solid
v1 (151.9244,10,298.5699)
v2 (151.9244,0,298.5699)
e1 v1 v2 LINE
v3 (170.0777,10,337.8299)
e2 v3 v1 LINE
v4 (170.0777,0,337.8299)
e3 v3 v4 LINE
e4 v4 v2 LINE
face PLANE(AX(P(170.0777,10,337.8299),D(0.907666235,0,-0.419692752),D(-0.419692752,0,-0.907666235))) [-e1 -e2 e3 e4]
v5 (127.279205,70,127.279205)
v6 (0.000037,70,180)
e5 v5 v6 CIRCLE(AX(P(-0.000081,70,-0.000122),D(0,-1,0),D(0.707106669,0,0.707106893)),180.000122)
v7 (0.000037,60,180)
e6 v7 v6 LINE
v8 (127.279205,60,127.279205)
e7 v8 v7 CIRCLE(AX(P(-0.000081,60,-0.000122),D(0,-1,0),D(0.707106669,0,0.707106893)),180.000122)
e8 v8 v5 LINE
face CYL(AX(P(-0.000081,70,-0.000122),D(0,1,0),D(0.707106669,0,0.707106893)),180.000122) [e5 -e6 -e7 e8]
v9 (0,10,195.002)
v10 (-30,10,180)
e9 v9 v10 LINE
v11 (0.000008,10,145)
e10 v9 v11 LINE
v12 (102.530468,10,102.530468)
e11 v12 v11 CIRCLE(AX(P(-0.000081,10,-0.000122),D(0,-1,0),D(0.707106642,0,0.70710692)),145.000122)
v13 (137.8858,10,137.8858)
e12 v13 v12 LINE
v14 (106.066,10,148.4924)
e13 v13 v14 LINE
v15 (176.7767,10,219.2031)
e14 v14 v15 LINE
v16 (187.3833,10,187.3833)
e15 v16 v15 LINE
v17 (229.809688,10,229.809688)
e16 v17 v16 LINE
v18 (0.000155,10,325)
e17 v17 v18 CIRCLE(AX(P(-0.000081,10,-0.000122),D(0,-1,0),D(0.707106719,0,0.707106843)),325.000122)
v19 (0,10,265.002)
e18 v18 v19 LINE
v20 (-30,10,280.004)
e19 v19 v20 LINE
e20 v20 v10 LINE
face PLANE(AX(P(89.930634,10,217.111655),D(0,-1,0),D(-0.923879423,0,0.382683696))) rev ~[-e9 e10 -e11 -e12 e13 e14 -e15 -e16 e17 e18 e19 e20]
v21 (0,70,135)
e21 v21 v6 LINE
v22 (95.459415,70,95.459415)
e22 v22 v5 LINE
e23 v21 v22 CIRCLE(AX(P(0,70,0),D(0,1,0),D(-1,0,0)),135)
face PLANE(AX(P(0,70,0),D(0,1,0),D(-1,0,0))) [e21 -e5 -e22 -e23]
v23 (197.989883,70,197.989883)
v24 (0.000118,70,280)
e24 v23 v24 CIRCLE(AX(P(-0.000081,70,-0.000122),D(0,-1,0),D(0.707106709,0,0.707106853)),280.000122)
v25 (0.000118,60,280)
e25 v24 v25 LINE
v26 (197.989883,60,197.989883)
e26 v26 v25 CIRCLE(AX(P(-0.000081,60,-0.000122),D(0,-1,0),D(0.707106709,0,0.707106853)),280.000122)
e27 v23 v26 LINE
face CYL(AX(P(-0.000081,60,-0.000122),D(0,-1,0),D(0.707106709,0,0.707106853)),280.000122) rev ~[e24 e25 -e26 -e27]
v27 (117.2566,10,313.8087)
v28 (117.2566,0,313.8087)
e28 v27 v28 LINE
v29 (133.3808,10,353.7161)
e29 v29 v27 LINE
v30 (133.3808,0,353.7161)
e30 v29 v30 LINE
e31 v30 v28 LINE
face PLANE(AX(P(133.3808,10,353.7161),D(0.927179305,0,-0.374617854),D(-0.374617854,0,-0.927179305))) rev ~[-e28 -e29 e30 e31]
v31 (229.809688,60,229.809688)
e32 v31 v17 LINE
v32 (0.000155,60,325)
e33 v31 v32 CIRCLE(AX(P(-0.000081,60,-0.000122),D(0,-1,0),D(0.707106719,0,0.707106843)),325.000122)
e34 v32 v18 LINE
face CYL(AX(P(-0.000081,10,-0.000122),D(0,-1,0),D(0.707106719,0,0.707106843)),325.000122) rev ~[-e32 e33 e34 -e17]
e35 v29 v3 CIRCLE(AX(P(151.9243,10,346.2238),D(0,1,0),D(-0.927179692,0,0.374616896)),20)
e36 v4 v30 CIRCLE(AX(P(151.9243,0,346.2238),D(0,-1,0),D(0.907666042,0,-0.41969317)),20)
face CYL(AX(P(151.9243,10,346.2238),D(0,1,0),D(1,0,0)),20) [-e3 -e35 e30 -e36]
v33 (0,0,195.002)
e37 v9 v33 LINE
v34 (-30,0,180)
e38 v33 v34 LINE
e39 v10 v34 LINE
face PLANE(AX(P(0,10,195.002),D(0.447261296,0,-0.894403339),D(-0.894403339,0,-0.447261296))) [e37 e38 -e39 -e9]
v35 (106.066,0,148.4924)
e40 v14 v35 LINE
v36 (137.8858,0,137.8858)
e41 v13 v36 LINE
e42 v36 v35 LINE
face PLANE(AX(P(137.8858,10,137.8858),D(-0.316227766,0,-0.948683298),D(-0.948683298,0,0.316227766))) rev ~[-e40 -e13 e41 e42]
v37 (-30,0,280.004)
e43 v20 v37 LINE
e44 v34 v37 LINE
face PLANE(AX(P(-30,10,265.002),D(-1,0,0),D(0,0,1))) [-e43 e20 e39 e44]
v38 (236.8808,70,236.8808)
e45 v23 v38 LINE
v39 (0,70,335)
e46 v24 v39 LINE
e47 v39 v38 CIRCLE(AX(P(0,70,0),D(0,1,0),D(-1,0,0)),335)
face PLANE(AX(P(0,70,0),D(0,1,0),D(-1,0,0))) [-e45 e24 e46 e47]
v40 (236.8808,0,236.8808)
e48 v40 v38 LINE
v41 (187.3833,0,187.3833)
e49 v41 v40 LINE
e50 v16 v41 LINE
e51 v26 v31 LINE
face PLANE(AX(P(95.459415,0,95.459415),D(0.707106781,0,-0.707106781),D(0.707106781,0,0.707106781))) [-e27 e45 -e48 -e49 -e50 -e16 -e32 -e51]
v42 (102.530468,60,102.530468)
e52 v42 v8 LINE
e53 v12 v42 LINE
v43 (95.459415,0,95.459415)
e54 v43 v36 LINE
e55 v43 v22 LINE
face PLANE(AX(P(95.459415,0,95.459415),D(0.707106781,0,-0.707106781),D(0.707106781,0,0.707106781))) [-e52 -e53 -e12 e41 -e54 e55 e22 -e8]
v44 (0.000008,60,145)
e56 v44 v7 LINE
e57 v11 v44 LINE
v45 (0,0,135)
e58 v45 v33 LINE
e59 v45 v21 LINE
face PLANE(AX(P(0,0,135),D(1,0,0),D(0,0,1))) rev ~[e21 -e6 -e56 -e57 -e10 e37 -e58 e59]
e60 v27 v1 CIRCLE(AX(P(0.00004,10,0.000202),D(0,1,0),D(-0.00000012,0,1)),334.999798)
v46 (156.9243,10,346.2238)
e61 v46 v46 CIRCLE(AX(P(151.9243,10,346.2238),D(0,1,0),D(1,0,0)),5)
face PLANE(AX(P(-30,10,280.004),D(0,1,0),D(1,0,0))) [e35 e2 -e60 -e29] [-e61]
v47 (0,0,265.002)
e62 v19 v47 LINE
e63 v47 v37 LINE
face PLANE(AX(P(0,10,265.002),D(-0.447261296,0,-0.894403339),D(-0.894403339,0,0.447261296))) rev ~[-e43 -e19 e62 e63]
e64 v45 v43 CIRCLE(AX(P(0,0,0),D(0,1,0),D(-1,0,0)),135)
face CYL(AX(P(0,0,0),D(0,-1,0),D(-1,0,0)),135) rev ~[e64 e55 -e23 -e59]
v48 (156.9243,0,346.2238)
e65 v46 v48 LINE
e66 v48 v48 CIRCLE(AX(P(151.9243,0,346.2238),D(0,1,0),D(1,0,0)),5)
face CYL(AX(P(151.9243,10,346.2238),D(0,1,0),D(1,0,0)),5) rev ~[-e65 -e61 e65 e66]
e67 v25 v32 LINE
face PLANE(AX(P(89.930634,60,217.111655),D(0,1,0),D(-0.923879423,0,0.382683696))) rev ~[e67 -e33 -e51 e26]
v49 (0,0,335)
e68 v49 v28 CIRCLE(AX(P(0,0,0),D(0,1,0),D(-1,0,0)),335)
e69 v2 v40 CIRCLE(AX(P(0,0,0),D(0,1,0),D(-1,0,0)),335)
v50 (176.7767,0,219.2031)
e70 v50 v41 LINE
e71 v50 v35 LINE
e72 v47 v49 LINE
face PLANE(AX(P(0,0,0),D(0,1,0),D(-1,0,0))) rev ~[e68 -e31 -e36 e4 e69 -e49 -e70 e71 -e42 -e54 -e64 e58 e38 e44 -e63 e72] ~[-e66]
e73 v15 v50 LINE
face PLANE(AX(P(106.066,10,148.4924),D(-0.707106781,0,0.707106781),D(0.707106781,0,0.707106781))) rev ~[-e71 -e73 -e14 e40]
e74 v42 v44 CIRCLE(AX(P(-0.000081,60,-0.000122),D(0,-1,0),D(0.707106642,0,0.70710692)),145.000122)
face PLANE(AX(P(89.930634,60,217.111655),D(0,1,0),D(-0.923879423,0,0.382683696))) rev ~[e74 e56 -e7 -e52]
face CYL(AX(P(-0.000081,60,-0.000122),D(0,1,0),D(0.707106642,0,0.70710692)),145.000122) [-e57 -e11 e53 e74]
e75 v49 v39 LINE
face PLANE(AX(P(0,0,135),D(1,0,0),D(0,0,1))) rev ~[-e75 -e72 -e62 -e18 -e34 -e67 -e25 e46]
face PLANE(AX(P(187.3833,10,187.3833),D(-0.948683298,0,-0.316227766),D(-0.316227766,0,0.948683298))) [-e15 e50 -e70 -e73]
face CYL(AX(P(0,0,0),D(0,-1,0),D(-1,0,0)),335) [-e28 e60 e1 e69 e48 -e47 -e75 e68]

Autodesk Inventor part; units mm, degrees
ref_plane "YZ Plane" through (0, 0, 0) normal (1, 0, 0) x (0, 1, 0)
ref_plane "XZ Plane" through (0, 0, 0) normal (0, 1, 0) x (-1, 0, 0)
ref_plane "XY Plane" through (0, 0, 0) normal (0, 0, 1) x (1, 0, 0)
sketch "Sketch1" plane through (0, 0, 0) normal (0, 1, 0) x (-1, 0, 0)
  circle A0 centre (0, 0) radius 335
  line L0 (335, 0) -> (-335, 0)
  line L1 (0, -335) -> (0, 335)
  line L2 (0, 0) -> (-236.8808, 236.8808)
  line L3 (0, 0) -> (236.8808, -236.8808)
  line L4 (0, 0) -> (236.8808, 236.8808)
  line L5 (0, 0) -> (-236.8808, -236.8808)
  circle A1 centre (0, 0) radius 135
  point P0 (-95.4594, 95.4594)
  point P1 (0, 135)
  dimension "d0" = 670
  dimension "d1" = 45
  dimension "d2" = 45
  dimension "d17" = 200
extrude "Extrusion1" add sketch "Sketch1" along normal blind 70 contours L1 A1 L2 A0
sketch "Sketch2" plane through (95.4594, 0, 95.4594) normal (0.7071068, 0, -0.7071068) x (-0.7071068, 0, -0.7071068)
  line L0 (-190, 60) -> (-10, 60)
  line L1 (-10, 60) -> (-10, 10)
  line L2 (-10, 10) -> (-190, 10)
  line L3 (-190, 10) -> (-190, 60)
  line L4 (-200, 0) -> (0, 0) projected
  line L5 (-200, 70) -> (0, 70) projected
  line L6 (-200, 0) -> (-200, 70) projected
  line L7 (0, 0) -> (0, 70) projected
  point P0 (135, 0)
  point P1 (0, 35)
  dimension "d6" = 10
  dimension "d7" = 10
  dimension "d8" = 10
  dimension "d9" = 10
sketch3d "3D Sketch1"
  arc A0 (95.4594, 70, 95.4594) -> (0, 70, 135) centre (0, 70, 0) ccw
sweep "Sweep1" cut profiles "Sketch2" path "3D Sketch1" contours L0 L1 L2 L3
sketch "Sketch3" plane through (95.4594, 0, 95.4594) normal (0.7071068, 0, -0.7071068) x (-0.7071068, 0, -0.7071068)
  line L0 (-101.8808, 70) -> (-200, 70) projected
  line L1 (32.4695, 60) -> (-94.8097, 60) projected
  line L2 (-145, 70) -> (-45, 70)
  line L3 (-45, 70) -> (-45, 60)
  line L4 (-45, 60) -> (-145, 60)
  line L5 (-145, 60) -> (-145, 70)
  line L6 (-200, 0) -> (-200, 70) projected
  line L7 (0, 0) -> (0, 70) projected
  point P0 (135, 0)
  dimension "d16" = 100
  dimension "d18" = 45
sketch3d "3D Sketch2"
  arc A0 (95.4594, 70, 95.4594) -> (0, 70, 135) centre (0, 70, 0) ccw
sweep "Sweep2" cut profiles "Sketch3" path "3D Sketch2"
sketch "Sketch5" plane through (0, 10, 325) normal (0, 1, 0) x (1, 0, 0)
  line L0 (0, 0) -> (0, 180) projected
  arc A0 (0, 145) -> (127.2792, 197.7208) centre (0, 325) ccw projected
  line L1 (127.2792, 197.7208) -> (95.4594, 229.5406) projected
  arc A1 (0, 190) -> (95.4594, 229.5406) centre (0, 325) ccw projected
  line L2 (0, 190) -> (0, 145) projected
  arc A2 (0, 45) -> (197.9899, 127.0101) centre (0, 325) ccw projected
  line L3 (0, 45) -> (0, -10) projected
  arc A3 (0, -10) -> (236.8808, 88.1192) centre (0, 325) ccw projected
  line L4 (236.8808, 88.1192) -> (197.9899, 127.0101) projected
  line L5 (0, 145) -> (-30, 145)
  line L6 (-30, 145) -> (-30, 44.996)
  line L7 (-30, 44.996) -> (0, 44.996)
  line L8 (0, 44.996) -> (0, 145)
  line L9 (0, 190) -> (0, -10) projected
  line L10 (0, 129.998) -> (-30, 129.998)
  line L11 (-30, 129.998) -> (-30, 59.998)
  line L12 (-30, 59.998) -> (0, 59.998)
  line L13 (0, 59.998) -> (0, 129.998)
  line L14 (0, 44.996) -> (-30, 145) construction
  line L15 (0, 145) -> (-30, 44.996) construction
  line L16 (0, 59.998) -> (-30, 129.998) construction
  line L17 (-30, 59.998) -> (0, 129.998) construction
  line L18 (-15, 94.998) -> (-30, 94.998) construction
  line L19 (-15, 94.998) -> (-30, 94.998) construction
  line L20 (0, 59.998) -> (-30, 44.996)
  line L21 (0, 129.998) -> (-30, 145)
  point P0 (0, 44.996)
  point P1 (0, 59.998)
  dimension "d21" = 30
  dimension "d27" = 70
extrude "Extrusion2" add sketch "Sketch5" against normal blind 10 contours L6 L12 L20 | L12 L6 L10 L0 | L10 L6 L21
sketch "Sketch6" plane through (-30, 10, 280.004) normal (0, 1, 0) x (1, 0, 0)
  line L0 (132.5305, 177.4736) -> (259.8097, 50.1943) projected
  arc A0 (30, 135.004) -> (132.5305, 177.4736) centre (30, 280.004) ccw projected
  line L1 (30, 85.002) -> (30, 135.004) projected
  line L2 (0, 100.004) -> (0, 0) projected
  line L3 (30, -44.996) -> (30, 15.002) projected
  arc A1 (30, -44.996) -> (259.8097, 50.1943) centre (30, 280.004) ccw projected
  arc A2 (30, 100.004) -> (157.2792, 152.7248) centre (30, 280.004) ccw projected
  line L4 (157.2792, 152.7248) -> (136.066, 131.5116)
  line L5 (136.066, 131.5116) -> (206.7767, 60.8009)
  line L6 (206.7767, 60.8009) -> (227.9899, 82.0141)
  line L7 (227.9899, 82.0141) -> (157.2792, 152.7248)
  arc A3 (30, 100.004) -> (157.2792, 152.7248) centre (30, 280.004) ccw projected
  arc A4 (30, 0.004) -> (227.9899, 82.0141) centre (30, 280.004) ccw projected
  line L8 (30, 0.004) -> (30, -54.996) projected
  arc A5 (30, -54.996) -> (266.8808, 43.1233) centre (30, 280.004) ccw projected
  line L9 (266.8808, 43.1233) -> (227.9899, 82.0141) projected
  arc A6 (30, 100.004) -> (157.2792, 152.7248) centre (30, 280.004) ccw projected
  line L10 (157.2792, 152.7248) -> (125.4594, 184.5446) projected
  arc A7 (30, 145.004) -> (125.4594, 184.5446) centre (30, 280.004) ccw projected
  line L11 (30, 145.004) -> (30, 100.004) projected
  line L12 (167.8858, 142.1182) -> (146.6726, 120.905)
  line L13 (146.6726, 120.905) -> (196.1701, 71.4075)
  line L14 (196.1701, 71.4075) -> (217.3833, 92.6207)
  line L15 (217.3833, 92.6207) -> (167.8858, 142.1182)
  line L16 (167.8858, 142.1182) -> (196.1701, 71.4075) construction
  line L17 (217.3833, 92.6207) -> (146.6726, 120.905) construction
  line L18 (157.2792, 152.7248) -> (206.7767, 60.8009) construction
  line L19 (227.9899, 82.0141) -> (136.066, 131.5116) construction
  line L20 (182.028, 106.7629) -> (171.4214, 96.1563) construction
  line L21 (182.028, 106.7629) -> (171.4214, 96.1563) construction
  line L22 (217.3833, 92.6207) -> (206.7767, 60.8009)
  line L23 (167.8858, 142.1182) -> (136.066, 131.5116)
  line L24 (30, 85.002) -> (0, 100.004) projected
  line L25 (0, 0) -> (30, 15.002) projected
  point P0 (207.7219, 63.6364)
  point P1 (217.3833, 92.6207)
  point P2 (167.8858, 142.1182)
  point P3 (205.637, 61.9406)
  dimension "d23" = 30
  dimension "d24" = 70
extrude "Extrusion3" cut sketch "Sketch6" against normal blind 10 contours L0 L14 L5 L12 | L12 L5 L23 | L22 A4 L5 L14 | L22 L5 A4
sketch "Sketch7" plane through (-30, 10, 280.004) normal (0, 1, 0) x (1, 0, 0)
  arc A0 (30, -44.996) -> (259.8097, 50.1943) centre (30, 280.004) ccw projected
  arc A1 (30, 0.004) -> (227.9899, 82.0141) centre (30, 280.004) ccw projected
  line L0 (30, 0.004) -> (30, -54.996) projected
  arc A2 (30, -54.996) -> (266.8808, 43.1233) centre (30, 280.004) ccw projected
  line L1 (266.8808, 43.1233) -> (227.9899, 82.0141) projected
  arc A3 (30, -54.996) -> (266.8808, 43.1233) centre (30, 280.004) ccw construction
  line L2 (30, 0.004) -> (266.8808, 43.1233) construction
  line L3 (266.8808, 43.1233) -> (227.9899, 82.0141) construction
  line L4 (266.8808, 43.1233) -> (217.3833, 92.6207) construction
  line L5 (227.9899, 82.0141) -> (227.9899, 82.0141) construction
  line L6 (217.3833, 92.6207) -> (259.8097, 50.1943) construction
  line L7 (227.9899, 82.0141) -> (227.9899, 82.0141) construction
  line L8 (227.9899, 82.0141) -> (227.9899, 82.0141) construction
  line L9 (227.9899, 82.0141) -> (227.9899, 82.0141) construction
  line L10 (227.9899, 82.0141) -> (39.9698, -54.8476) construction
  line L11 (143.7771, 20.7148) -> (196.6229, -99.7168) construction
  circle A4 centre (181.9243, -66.2198) radius 20
  line L12 (163.3808, -73.7121) -> (147.2566, -33.8047)
  line L13 (200.0777, -57.8259) -> (181.9244, -18.5659)
  circle A5 centre (181.9243, -66.2198) radius 5
  point P0 (181.9244, -18.5659)
  point P1 (147.2566, -33.8047)
  dimension "d28" = 40
  dimension "d31" = 10
extrude "Extrusion4" add sketch "Sketch7" against normal blind 10 contours A2 L13 A4 L12 | A4
properties part number "Carousel Fixed Track"
